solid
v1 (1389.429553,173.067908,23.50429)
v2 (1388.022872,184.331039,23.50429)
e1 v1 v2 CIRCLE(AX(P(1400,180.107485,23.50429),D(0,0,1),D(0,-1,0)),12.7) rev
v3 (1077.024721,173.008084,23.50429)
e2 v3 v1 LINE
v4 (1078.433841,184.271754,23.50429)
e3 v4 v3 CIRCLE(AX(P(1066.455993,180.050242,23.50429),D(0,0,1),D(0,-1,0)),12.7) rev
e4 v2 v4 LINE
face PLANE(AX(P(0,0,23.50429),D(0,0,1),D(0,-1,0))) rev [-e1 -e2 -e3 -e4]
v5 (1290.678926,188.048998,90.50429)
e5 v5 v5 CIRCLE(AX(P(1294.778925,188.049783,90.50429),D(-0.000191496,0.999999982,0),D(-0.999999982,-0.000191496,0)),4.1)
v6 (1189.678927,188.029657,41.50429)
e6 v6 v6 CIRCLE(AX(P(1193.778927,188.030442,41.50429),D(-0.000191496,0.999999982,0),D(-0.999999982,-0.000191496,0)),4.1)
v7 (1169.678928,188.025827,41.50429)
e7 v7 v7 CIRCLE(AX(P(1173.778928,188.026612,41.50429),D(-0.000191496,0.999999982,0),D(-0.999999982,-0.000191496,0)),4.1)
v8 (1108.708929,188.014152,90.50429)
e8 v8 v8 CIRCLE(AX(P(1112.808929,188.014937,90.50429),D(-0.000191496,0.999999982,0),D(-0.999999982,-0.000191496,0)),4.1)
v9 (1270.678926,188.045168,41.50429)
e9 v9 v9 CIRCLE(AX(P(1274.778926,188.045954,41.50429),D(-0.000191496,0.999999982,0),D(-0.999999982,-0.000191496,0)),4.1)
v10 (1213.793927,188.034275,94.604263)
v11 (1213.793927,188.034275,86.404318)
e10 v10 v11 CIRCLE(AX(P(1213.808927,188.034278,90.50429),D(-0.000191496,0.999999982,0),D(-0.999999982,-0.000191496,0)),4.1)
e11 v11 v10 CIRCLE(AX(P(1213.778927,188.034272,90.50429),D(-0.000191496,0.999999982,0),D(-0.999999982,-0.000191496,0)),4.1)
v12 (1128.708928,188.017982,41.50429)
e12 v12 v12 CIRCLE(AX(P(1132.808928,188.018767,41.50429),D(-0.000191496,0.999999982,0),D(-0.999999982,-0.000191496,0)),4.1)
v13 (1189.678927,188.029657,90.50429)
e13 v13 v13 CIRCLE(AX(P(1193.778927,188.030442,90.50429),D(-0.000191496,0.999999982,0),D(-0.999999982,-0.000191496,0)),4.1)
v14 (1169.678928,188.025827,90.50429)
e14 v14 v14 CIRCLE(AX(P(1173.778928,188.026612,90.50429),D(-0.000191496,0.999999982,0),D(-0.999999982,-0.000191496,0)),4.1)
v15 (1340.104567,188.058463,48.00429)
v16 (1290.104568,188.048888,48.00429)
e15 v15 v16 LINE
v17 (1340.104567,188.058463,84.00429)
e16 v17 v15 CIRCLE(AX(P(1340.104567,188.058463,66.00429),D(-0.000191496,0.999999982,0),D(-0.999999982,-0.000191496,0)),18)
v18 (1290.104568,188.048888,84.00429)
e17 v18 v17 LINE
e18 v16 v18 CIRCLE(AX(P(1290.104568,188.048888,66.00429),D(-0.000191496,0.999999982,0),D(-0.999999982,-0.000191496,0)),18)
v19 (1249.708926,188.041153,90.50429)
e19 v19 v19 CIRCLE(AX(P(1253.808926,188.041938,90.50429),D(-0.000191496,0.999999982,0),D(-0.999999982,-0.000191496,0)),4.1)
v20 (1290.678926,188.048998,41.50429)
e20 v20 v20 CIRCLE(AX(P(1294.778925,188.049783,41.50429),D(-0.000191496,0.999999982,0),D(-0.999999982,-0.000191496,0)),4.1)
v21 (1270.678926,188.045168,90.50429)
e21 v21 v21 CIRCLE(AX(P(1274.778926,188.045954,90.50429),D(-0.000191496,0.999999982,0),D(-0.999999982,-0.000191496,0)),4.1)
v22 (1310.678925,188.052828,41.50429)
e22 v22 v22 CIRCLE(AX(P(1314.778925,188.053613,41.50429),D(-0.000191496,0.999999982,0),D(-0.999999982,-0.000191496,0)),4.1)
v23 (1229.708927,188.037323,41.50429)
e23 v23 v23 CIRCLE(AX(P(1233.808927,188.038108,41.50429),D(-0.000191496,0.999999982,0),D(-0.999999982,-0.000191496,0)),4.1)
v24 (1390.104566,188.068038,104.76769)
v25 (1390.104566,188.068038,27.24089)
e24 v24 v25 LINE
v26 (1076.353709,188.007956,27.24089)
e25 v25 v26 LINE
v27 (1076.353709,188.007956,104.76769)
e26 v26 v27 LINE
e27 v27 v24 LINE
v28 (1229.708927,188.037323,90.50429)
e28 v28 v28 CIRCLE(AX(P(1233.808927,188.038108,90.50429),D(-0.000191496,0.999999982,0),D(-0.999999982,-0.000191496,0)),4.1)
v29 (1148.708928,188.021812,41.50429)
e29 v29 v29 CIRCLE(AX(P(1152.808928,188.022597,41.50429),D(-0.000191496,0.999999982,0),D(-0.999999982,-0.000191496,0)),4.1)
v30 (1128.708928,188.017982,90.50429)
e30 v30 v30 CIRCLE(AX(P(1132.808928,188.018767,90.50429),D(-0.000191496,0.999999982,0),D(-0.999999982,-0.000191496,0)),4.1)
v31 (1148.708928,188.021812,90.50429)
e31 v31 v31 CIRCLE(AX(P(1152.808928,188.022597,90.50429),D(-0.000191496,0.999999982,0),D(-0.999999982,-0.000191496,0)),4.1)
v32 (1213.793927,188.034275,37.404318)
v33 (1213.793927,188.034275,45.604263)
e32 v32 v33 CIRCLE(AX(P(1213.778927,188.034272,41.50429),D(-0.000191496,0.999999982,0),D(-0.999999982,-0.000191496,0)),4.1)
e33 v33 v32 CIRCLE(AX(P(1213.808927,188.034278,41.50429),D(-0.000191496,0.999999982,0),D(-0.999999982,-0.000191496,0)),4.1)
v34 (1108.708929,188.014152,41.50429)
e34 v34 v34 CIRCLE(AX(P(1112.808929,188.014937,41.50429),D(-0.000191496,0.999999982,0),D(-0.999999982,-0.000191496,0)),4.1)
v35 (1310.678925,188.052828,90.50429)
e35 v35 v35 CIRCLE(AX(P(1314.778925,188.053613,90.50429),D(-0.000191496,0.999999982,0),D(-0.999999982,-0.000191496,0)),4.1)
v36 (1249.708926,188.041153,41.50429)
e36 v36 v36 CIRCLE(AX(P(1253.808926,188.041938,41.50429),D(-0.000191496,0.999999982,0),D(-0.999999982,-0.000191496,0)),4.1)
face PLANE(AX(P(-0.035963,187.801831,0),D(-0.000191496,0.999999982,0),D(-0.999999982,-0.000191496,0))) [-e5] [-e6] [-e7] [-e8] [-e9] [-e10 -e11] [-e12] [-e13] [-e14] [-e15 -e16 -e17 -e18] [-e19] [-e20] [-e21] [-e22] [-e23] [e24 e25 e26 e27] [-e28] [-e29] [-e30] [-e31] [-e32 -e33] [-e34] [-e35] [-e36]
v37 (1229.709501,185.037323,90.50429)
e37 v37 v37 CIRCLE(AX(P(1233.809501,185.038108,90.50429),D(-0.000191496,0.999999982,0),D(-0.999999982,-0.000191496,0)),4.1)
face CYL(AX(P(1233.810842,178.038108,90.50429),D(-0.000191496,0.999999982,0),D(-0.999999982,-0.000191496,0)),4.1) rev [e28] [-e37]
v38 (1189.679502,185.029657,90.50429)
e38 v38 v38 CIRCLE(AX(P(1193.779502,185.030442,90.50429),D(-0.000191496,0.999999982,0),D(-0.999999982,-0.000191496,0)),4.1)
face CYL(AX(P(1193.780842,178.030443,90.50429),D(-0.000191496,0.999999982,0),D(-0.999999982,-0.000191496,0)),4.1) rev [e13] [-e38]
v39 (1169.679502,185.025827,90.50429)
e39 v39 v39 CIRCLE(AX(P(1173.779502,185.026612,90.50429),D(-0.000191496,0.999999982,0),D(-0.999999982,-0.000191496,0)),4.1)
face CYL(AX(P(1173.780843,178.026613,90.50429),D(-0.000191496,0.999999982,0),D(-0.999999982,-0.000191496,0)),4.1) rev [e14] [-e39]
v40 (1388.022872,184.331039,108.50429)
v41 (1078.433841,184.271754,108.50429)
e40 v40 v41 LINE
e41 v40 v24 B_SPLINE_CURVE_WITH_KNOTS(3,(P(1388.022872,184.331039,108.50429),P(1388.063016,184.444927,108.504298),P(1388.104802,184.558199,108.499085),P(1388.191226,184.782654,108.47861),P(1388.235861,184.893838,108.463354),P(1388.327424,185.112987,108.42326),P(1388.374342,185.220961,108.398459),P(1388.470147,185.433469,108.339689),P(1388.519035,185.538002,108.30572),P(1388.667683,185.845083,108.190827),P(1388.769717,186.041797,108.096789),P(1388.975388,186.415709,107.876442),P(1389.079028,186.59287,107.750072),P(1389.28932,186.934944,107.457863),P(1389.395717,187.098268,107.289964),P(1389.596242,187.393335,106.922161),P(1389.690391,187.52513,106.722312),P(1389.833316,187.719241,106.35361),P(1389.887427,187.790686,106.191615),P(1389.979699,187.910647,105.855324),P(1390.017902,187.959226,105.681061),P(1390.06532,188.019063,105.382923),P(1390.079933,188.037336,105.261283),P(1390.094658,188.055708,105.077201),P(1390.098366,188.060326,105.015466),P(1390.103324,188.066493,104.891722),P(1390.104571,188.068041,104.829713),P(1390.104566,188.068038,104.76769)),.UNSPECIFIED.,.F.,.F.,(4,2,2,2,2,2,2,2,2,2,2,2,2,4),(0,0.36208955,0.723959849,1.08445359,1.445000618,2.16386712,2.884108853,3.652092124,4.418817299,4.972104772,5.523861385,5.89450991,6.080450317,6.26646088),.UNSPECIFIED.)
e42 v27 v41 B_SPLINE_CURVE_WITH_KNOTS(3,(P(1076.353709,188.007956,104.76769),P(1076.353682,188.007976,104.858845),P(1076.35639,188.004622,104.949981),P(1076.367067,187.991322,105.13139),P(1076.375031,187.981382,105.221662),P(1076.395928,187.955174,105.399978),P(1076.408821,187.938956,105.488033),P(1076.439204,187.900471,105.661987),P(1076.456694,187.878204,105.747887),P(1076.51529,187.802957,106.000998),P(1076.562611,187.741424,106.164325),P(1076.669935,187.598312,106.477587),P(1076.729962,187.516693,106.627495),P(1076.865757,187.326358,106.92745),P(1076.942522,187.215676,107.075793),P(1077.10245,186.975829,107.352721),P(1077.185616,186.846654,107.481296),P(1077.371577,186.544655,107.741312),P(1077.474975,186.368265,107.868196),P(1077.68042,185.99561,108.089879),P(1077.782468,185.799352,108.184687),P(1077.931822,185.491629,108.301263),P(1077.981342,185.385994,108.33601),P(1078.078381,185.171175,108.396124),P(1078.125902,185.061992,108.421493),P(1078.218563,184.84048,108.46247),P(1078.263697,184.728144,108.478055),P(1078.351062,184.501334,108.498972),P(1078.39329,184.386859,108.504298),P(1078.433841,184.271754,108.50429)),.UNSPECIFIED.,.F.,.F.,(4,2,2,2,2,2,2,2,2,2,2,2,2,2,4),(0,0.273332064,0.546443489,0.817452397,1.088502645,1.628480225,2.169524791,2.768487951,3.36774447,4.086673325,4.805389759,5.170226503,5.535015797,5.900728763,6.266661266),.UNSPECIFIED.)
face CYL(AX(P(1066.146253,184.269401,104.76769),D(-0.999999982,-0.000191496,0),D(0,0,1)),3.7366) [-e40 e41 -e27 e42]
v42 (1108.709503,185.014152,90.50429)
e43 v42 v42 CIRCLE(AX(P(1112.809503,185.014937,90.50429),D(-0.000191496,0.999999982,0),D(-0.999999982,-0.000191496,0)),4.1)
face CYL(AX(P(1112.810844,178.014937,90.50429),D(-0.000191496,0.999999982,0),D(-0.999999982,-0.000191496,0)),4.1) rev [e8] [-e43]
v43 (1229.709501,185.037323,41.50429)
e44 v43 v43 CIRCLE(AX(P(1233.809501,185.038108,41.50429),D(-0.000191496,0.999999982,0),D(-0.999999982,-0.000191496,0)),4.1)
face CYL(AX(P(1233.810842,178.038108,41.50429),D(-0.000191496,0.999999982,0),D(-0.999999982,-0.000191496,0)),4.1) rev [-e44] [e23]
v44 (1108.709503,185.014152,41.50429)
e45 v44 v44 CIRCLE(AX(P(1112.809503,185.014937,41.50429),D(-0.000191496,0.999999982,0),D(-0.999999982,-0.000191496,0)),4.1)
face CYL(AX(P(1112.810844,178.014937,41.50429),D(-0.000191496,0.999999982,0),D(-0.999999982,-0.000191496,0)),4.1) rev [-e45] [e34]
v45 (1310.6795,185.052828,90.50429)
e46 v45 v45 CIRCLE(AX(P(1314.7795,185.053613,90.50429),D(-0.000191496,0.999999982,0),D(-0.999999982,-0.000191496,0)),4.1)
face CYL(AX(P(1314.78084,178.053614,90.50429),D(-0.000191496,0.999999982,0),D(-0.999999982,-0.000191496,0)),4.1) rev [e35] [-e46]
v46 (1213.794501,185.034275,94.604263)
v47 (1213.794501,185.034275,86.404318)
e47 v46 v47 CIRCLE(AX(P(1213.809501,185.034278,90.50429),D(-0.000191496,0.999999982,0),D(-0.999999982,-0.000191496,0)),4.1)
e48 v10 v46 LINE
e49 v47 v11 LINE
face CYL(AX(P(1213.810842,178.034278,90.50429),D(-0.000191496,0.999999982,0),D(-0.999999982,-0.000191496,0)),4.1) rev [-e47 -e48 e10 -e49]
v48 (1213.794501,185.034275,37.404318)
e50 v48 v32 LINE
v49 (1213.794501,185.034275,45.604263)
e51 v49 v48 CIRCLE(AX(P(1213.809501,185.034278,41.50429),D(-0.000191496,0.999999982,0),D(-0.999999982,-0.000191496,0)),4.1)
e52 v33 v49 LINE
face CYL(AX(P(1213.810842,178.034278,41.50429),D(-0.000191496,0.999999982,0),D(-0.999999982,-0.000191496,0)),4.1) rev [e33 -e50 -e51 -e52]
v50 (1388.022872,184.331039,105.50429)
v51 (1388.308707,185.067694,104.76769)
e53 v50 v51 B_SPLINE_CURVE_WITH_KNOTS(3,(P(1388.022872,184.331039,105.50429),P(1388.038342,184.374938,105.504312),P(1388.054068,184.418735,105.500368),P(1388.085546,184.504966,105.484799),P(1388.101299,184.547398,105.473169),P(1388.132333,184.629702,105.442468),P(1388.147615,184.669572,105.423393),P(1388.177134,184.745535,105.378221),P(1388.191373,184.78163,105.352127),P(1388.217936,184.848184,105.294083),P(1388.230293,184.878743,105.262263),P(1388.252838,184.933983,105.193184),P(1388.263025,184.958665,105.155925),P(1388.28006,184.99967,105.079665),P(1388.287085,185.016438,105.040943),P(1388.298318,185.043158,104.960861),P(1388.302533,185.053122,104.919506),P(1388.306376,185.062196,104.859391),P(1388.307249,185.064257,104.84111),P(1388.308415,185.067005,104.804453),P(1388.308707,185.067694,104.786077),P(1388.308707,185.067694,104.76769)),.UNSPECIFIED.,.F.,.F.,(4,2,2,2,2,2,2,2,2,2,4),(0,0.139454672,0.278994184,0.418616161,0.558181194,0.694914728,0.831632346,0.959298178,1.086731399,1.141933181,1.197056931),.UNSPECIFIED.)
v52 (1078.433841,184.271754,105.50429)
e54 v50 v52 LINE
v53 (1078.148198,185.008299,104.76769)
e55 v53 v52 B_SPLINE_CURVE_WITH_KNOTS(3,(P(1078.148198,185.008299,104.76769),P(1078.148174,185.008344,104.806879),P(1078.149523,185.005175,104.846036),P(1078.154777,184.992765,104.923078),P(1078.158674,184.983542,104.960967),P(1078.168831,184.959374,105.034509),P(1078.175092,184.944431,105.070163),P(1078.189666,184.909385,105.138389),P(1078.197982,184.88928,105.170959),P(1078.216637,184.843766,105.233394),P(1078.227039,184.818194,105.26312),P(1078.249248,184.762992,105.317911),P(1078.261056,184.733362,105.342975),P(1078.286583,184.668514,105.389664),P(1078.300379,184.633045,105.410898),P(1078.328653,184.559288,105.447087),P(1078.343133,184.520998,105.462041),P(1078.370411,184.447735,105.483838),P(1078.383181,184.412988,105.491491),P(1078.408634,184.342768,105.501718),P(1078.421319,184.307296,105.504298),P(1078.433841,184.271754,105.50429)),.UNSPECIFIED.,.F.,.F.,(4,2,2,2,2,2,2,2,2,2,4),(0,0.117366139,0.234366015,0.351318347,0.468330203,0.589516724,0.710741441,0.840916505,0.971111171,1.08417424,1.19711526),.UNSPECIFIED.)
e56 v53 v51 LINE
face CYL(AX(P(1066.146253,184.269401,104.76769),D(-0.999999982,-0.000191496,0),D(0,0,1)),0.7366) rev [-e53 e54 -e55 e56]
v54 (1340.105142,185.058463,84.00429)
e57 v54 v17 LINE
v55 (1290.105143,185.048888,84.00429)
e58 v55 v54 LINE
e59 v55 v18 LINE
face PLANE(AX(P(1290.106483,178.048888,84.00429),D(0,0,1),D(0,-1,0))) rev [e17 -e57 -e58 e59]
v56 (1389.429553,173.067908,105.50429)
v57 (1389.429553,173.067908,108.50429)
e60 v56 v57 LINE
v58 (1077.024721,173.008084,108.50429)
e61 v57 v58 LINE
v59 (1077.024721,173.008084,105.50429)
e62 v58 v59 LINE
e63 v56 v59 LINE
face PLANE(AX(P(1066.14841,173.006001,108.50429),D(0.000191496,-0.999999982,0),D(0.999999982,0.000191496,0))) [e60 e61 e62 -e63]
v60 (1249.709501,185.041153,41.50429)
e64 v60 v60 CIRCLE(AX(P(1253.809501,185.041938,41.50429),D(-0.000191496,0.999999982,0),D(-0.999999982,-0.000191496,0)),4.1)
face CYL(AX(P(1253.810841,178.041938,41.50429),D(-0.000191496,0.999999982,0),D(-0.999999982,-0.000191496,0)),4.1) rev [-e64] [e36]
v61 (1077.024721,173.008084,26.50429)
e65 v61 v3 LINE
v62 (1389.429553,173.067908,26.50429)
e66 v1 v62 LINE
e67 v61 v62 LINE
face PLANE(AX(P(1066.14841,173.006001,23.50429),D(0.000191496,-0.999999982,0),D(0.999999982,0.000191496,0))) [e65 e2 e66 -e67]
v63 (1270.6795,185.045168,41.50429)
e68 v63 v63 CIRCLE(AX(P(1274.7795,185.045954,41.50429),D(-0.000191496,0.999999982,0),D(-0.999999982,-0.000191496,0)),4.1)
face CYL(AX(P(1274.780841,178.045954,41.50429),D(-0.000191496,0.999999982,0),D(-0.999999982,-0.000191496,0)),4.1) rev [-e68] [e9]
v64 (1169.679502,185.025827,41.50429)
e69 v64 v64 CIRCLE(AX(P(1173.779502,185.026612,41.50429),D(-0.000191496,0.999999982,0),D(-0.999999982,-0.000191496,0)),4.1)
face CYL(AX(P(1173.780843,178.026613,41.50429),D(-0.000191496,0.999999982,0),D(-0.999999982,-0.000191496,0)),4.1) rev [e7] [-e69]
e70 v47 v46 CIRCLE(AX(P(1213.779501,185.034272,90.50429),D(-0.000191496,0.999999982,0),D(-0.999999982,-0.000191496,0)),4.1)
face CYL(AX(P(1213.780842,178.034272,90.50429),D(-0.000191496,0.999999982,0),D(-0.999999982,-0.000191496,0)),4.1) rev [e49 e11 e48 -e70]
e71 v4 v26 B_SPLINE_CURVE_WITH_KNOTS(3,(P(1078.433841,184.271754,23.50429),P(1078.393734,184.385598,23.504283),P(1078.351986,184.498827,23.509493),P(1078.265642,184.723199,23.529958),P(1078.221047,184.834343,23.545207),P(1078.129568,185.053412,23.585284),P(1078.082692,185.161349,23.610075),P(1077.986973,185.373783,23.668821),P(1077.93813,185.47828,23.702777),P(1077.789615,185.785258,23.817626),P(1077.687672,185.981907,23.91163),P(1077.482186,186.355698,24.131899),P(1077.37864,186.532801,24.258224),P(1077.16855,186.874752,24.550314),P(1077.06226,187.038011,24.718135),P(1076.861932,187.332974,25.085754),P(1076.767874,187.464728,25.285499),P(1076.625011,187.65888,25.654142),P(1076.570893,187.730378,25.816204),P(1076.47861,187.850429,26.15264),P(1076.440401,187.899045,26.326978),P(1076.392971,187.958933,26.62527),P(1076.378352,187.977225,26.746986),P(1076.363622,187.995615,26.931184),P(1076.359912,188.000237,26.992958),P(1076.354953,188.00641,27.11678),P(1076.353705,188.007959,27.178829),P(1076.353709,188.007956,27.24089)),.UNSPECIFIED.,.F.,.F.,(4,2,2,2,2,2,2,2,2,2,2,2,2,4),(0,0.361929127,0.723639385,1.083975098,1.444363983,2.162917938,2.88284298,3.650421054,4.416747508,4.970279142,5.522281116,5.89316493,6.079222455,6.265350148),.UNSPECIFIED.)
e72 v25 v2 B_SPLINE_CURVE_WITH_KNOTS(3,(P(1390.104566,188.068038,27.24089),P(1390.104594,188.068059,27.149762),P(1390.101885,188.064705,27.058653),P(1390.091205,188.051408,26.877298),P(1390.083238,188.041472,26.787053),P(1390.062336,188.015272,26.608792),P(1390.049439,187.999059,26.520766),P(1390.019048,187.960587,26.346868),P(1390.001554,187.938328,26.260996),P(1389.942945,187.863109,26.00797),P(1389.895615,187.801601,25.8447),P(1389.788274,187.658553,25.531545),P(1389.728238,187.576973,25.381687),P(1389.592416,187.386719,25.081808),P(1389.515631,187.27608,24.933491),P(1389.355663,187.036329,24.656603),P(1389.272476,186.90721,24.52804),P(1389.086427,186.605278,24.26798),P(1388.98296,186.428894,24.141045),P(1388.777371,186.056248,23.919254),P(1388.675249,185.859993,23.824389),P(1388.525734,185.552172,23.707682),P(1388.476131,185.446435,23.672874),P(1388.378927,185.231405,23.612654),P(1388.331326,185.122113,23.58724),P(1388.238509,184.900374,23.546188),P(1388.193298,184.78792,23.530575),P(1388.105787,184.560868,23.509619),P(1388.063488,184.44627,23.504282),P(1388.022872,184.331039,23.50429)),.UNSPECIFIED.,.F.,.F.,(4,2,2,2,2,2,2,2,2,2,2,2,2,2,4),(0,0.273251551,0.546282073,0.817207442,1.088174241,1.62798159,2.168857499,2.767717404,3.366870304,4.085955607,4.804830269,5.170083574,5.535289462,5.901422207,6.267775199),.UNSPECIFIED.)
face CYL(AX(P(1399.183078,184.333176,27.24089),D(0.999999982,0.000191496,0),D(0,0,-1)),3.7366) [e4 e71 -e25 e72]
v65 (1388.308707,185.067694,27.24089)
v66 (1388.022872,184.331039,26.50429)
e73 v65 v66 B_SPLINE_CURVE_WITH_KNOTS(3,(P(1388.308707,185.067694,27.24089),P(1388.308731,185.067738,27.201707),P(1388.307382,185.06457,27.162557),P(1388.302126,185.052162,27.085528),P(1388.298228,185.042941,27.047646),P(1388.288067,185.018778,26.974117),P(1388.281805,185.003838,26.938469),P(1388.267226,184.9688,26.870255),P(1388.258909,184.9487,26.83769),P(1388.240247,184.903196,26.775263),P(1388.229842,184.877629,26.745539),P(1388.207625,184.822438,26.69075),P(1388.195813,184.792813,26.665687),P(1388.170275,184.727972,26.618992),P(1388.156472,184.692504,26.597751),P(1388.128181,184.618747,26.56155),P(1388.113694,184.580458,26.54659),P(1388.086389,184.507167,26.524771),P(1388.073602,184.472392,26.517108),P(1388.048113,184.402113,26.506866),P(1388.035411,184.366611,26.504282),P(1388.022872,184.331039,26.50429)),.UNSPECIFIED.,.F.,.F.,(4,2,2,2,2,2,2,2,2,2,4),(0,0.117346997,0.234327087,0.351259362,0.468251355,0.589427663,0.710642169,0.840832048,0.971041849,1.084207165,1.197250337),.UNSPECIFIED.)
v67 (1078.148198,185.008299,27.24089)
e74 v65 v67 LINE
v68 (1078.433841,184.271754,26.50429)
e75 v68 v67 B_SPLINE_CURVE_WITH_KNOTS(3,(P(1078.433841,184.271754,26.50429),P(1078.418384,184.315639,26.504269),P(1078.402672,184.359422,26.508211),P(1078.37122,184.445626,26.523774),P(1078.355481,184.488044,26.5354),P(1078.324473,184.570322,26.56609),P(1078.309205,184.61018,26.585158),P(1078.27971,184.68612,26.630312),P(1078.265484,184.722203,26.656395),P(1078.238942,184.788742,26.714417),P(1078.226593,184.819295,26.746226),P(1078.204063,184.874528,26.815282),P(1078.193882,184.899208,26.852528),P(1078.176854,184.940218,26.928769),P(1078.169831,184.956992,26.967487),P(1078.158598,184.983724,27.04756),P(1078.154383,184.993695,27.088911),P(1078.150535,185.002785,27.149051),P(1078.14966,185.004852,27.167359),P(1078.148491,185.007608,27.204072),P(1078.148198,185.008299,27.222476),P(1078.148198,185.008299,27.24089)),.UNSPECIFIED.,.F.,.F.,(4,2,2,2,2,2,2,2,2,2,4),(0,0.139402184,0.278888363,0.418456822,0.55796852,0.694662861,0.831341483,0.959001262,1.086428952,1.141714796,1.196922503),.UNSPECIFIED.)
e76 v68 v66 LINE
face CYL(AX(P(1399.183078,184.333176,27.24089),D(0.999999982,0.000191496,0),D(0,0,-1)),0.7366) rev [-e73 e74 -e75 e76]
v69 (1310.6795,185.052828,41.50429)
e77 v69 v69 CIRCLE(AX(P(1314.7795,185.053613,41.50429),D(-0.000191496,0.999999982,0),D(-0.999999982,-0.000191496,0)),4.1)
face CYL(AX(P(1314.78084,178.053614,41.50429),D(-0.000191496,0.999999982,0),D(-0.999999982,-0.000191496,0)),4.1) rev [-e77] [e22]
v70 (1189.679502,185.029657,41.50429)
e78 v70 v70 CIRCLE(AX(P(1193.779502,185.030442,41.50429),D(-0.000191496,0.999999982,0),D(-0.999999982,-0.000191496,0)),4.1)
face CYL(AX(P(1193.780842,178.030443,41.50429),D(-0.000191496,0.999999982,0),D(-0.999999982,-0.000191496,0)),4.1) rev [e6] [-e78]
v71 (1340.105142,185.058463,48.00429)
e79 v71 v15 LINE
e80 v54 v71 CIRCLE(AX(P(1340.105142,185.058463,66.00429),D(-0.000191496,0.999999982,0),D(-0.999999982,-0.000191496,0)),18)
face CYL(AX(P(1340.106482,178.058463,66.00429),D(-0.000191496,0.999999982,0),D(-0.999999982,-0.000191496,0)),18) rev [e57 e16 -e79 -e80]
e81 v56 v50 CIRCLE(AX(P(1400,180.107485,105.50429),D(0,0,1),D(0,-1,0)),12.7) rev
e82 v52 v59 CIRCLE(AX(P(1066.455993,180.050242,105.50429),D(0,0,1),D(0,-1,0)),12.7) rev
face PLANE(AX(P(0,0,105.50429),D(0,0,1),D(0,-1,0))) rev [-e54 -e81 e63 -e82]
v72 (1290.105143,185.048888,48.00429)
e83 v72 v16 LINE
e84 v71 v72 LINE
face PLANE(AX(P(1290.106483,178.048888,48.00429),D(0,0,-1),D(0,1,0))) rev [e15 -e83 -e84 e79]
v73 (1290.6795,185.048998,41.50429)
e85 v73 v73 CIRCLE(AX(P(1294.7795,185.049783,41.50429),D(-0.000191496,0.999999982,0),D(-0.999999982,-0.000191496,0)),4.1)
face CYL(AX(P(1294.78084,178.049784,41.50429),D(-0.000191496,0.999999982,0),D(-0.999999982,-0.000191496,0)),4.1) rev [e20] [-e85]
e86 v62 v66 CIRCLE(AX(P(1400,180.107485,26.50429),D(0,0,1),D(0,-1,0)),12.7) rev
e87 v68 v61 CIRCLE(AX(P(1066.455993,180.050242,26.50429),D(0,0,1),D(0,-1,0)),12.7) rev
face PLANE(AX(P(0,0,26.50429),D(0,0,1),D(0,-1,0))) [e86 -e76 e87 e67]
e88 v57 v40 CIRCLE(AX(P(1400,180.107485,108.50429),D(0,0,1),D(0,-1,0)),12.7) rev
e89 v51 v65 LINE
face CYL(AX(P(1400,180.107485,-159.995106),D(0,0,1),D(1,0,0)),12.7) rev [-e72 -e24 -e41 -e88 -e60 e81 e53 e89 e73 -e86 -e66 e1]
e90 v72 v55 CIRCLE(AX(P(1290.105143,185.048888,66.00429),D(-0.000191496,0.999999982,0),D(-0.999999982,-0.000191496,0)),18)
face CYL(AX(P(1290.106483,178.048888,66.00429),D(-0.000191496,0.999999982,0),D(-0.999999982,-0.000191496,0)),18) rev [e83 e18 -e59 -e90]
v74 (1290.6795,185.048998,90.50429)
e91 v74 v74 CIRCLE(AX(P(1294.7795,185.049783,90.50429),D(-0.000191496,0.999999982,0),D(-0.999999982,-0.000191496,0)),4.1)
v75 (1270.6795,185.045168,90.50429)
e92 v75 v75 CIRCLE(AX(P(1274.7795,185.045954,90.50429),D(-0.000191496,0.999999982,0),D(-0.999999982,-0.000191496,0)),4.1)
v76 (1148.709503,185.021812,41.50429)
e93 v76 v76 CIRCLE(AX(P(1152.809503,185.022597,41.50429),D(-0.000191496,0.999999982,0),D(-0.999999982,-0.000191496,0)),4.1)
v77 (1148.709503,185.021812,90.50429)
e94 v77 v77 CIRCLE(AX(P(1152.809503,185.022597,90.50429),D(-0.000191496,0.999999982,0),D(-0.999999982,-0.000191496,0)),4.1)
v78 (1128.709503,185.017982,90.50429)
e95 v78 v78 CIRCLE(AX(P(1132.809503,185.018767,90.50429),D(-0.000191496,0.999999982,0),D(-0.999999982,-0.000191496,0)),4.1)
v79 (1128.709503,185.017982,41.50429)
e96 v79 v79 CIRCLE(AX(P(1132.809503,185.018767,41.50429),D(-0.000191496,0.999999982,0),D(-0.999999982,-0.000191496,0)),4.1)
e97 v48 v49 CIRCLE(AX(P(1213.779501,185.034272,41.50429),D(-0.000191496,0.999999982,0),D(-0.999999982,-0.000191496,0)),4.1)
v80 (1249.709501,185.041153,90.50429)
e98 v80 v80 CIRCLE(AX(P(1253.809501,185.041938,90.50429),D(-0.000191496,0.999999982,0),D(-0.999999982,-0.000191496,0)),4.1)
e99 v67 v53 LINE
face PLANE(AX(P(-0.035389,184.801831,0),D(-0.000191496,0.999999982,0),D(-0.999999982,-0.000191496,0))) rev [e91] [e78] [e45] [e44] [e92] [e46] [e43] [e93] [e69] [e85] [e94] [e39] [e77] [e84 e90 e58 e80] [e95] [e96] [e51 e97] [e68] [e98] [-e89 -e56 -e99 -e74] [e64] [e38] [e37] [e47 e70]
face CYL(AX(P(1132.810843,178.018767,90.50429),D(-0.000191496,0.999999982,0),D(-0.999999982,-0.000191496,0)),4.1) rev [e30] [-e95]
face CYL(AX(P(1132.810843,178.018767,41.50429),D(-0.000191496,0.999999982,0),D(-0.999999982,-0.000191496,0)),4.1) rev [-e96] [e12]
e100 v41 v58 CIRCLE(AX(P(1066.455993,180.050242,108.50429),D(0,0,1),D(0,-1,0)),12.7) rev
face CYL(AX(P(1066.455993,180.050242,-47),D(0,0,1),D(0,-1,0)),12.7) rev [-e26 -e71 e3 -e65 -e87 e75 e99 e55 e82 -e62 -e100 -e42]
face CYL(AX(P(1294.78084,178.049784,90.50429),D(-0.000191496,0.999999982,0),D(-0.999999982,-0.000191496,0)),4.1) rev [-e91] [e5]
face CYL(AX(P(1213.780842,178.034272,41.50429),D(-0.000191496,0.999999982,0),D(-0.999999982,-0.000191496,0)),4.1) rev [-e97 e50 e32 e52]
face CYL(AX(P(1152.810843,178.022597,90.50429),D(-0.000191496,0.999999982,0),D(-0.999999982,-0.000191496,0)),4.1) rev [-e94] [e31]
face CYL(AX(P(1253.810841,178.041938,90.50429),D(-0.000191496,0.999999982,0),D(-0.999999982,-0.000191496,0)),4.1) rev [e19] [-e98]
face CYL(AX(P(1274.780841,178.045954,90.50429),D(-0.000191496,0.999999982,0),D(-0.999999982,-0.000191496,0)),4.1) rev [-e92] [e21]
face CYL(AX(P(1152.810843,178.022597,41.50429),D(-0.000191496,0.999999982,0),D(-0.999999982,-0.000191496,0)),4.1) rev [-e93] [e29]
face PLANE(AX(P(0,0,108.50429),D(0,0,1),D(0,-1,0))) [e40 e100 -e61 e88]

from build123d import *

# Parameters (mm, degrees)
SKETCH3_W                      = 333.036830712
SKETCH3_H                      = 85
BASE_FLANGE1_DEPTH             = 3
EDGE_FLANGE1_STRIP_W           = 13.4732
EDGE_FLANGE1_STRIP_H           = 3
EDGE_FLANGE1_STRIP_CUT_DEPTH   = 333.036830711
EDGE_FLANGE1_STRIP_2_W         = 13.4732
EDGE_FLANGE1_STRIP_2_H         = 3
EDGE_FLANGE1_STRIP_CUT_2_DEPTH = 333.036830711
EDGE_FLANGE1_DEPTH             = 333.036830711
EDGE_FLANGE1_BEND_DEPTH        = 333.036830711
SKETCH14_R                     = 4.1
CUT_EXTRUDE1_DEPTH             = 10
LPATTERN1_COUNT                = 3
LPATTERN1_PITCH                = 20
INDENT1_START                  = 23
INDENT1_DEPTH                  = 87
INDENT1_START_2                = 1066.181520764
INDENT1_2_DEPTH                = 11.708931468
INDENT1_START_3                = 23.50429019
INDENT1_3_DEPTH                = 85
INDENT1_START_4                = 1388.984464138
INDENT1_4_DEPTH                = 10.233887338
INDENT1_5_DEPTH                = 85
CUT_EXTRUDE2_DEPTH             = 10
LPATTERN2_COUNT                = 2
LPATTERN2_PITCH                = 101
LPATTERN2_COPY_1_SKETCH_R      = 4.1
LPATTERN2_COPY_1_DEPTH         = 10
LPATTERN2_COPY_2_SKETCH_R      = 4.1
LPATTERN2_COPY_2_DEPTH         = 10


with BuildPart() as part:
    # Base-Flange1: sheet metal written as solids
    # Sketch3 → Base-Flange1 (new body)
    with BuildSketch(Plane(origin=(-0.035963347, 187.801831242, 0), x_dir=(0.9999999816645936, 0.0001914962472965804, 0), z_dir=(-0.0001914962472965804, 0.9999999816645936, 0))):
        with Locations((1232.69993612, -66.00429019)):
            Rectangle(SKETCH3_W, SKETCH3_H)
    extrude(amount=-BASE_FLANGE1_DEPTH)

    # Edge-Flange1: sheet metal written as solids
    # Edge-Flange1 strip (on a plane across the edge) → Edge-Flange1 strip cut (cut)
    with BuildSketch(Plane(origin=(1399.182936963, 185.06977636, 108.50429019), x_dir=(0, 0, -1), z_dir=(-0.9999999816645935, -0.00019149624729661617, 0))):
        with Locations((-3, -1.5)):
            Rectangle(EDGE_FLANGE1_STRIP_W, EDGE_FLANGE1_STRIP_H)
    extrude(amount=EDGE_FLANGE1_STRIP_CUT_DEPTH, mode=Mode.SUBTRACT)

    # Edge-Flange1 strip 2 (on a plane across the edge) → Edge-Flange1 strip cut 2 (cut)
    with BuildSketch(Plane(origin=(1066.146112358, 185.006001057, 23.50429019), x_dir=(0, 0, 1), z_dir=(0.9999999816645935, 0.00019149624729661617, 0))):
        with Locations((-3, -1.5)):
            Rectangle(EDGE_FLANGE1_STRIP_2_W, EDGE_FLANGE1_STRIP_2_H)
    extrude(amount=EDGE_FLANGE1_STRIP_CUT_2_DEPTH, mode=Mode.SUBTRACT)

    # Edge-Flange1 section (on a plane across the edge) → Edge-Flange1 (add)
    with BuildSketch(Plane(origin=(1399.182936963, 185.06977636, 108.50429019), x_dir=(0, 0, -1), z_dir=(-0.9999999816645935, -0.00019149624729661617, 0))):
        with BuildLine():
            Line((0, 0.7366), (0, 12))
            Line((0, 12), (3, 12))
            Line((3, 12), (3, 0.7366))
            ThreePointArc((3, 0.7366), (3.215745145, 0.215745145), (3.7366, 0))
            Line((3.7366, 0), (3.7366, -3))
            ThreePointArc((3.7366, -3), (1.094424801, -1.905575199), (0, 0.7366))
        make_face()
    extrude(amount=EDGE_FLANGE1_DEPTH)

    # Edge-Flange1 section 2 (on a plane across the edge) → Edge-Flange1 bend (add)
    with BuildSketch(Plane(origin=(1066.146112358, 185.006001057, 23.50429019), x_dir=(0, 0, 1), z_dir=(0.9999999816645935, 0.00019149624729661617, 0))):
        with BuildLine():
            Line((0, 0.7366), (0, 12))
            Line((0, 12), (3, 12))
            Line((3, 12), (3, 0.7366))
            ThreePointArc((3, 0.7366), (3.215745145, 0.215745145), (3.7366, 0))
            Line((3.7366, 0), (3.7366, -3))
            ThreePointArc((3.7366, -3), (1.094424801, -1.905575199), (0, 0.7366))
        make_face()
    extrude(amount=EDGE_FLANGE1_BEND_DEPTH)

    # Sketch14 → Cut-Extrude1 (cut)
    with BuildSketch(Plane(origin=(-0.035963347, 187.801831242, 0), x_dir=(0.9999999816645936, 0.00019149624729658044, 0), z_dir=(-0.00019149624729658044, 0.9999999816645936, 0))):
        with Locations(Location((1152.844912527, -41.50429019, 0), (0, 0, 180))):
            Circle(SKETCH14_R)
        with Locations(Location((1213.814912527, -41.50429019, 0), (0, 0, 180))):
            Circle(SKETCH14_R)
        with Locations(Location((1152.844912527, -90.50429019, 0), (0, 0, 180))):
            Circle(SKETCH14_R)
        with Locations(Location((1213.814912527, -90.50429019, 0), (0, 0, 180))):
            Circle(SKETCH14_R)
    cut_extrude1 = extrude(amount=-CUT_EXTRUDE1_DEPTH, mode=Mode.SUBTRACT)

    # LPattern1: Cut-Extrude1 ×3
    with Locations(*[Vector(-0.9999999816645936, -0.00019149624729658041, 0) * (i * LPATTERN1_PITCH) for i in range(1, LPATTERN1_COUNT)]):
        add(cut_extrude1, mode=Mode.SUBTRACT)

    # Indent1: read off the stored shape, not the designer's step
    # Indent1 outline → Indent1 (cut)
    with BuildSketch(Plane.XY.offset(INDENT1_START)):
        with BuildLine():
            Line((1391.658769663, 190), (1390.104573792, 188.068047026))
            ThreePointArc((1390.104573792, 188.068047026), (1387.312839815, 180.67842019), (1389.429552771, 173.067908404))
            Line((1389.429552771, 173.067908404), (1390.14074534, 172))
            Line((1390.14074534, 172), (1399.185439777, 172))
            Line((1399.185439777, 172), (1401, 172))
            Line((1401, 172), (1401, 190))
            Line((1401, 190), (1391.658769663, 190))
        make_face()
        with BuildLine():
            Line((1076.353702039, 188.007964899), (1074.752112936, 190))
            Line((1074.752112936, 190), (1065, 190))
            Line((1065, 190), (1065, 172))
            Line((1065, 172), (1066.14860296, 172))
            Line((1066.14860296, 172), (1076.353013915, 172))
            Line((1076.353013915, 172), (1077.024720786, 173.00808405))
            ThreePointArc((1077.024720786, 173.00808405), (1079.143304168, 180.617808163), (1076.353702039, 188.007964899))
        make_face()
    extrude(amount=INDENT1_DEPTH, mode=Mode.SUBTRACT)

    # Sketch15 → Cut-Extrude2 (cut)
    with BuildSketch(Plane(origin=(-0.035963347, 187.801831242, 0), x_dir=(0.9999999816645936, 0.0001914962472966162, 0), z_dir=(-0.0001914962472966162, 0.9999999816645936, 0))):
        with BuildLine():
            Line((1290.140555319, -48.00429019), (1340.140555319, -48.00429019))
            ThreePointArc((1340.140555319, -48.00429019), (1358.140555319, -66.00429019), (1340.140555319, -84.00429019))
            Line((1340.140555319, -84.00429019), (1290.140555319, -84.00429019))
            ThreePointArc((1290.140555319, -84.00429019), (1272.140555319, -66.00429019), (1290.140555319, -48.00429019))
        make_face()
    extrude(amount=-CUT_EXTRUDE2_DEPTH, mode=Mode.SUBTRACT)

    # LPattern2: Cut-Extrude1 ×2
    with Locations(*[Vector(0.9999999816645935, 0.0001914962472965804, 0) * (i * LPATTERN2_PITCH) for i in range(1, LPATTERN2_COUNT)]):
        add(cut_extrude1, mode=Mode.SUBTRACT)

    # LPattern2 copy 1 sketch → LPattern2 copy 1 (cut)
    with BuildSketch(Plane(origin=(80.964035168, 187.817342438, 0), x_dir=(0.9999999816645936, 0.00019149624729658044, 0), z_dir=(-0.00019149624729658044, 0.9999999816645936, 0))):
        with Locations(Location((1152.844912527, -41.50429019, 0), (0, 0, 180))):
            Circle(LPATTERN2_COPY_1_SKETCH_R)
        with Locations(Location((1213.814912527, -41.50429019, 0), (0, 0, 180))):
            Circle(LPATTERN2_COPY_1_SKETCH_R)
        with Locations(Location((1152.844912527, -90.50429019, 0), (0, 0, 180))):
            Circle(LPATTERN2_COPY_1_SKETCH_R)
        with Locations(Location((1213.814912527, -90.50429019, 0), (0, 0, 180))):
            Circle(LPATTERN2_COPY_1_SKETCH_R)
    extrude(amount=-LPATTERN2_COPY_1_DEPTH, mode=Mode.SUBTRACT)

    # LPattern2 copy 2 sketch → LPattern2 copy 2 (cut)
    with BuildSketch(Plane(origin=(60.964035535, 187.813512513, 0), x_dir=(0.9999999816645936, 0.00019149624729658044, 0), z_dir=(-0.00019149624729658044, 0.9999999816645936, 0))):
        with Locations(Location((1152.844912527, -41.50429019, 0), (0, 0, 180))):
            Circle(LPATTERN2_COPY_2_SKETCH_R)
        with Locations(Location((1213.814912527, -41.50429019, 0), (0, 0, 180))):
            Circle(LPATTERN2_COPY_2_SKETCH_R)
        with Locations(Location((1152.844912527, -90.50429019, 0), (0, 0, 180))):
            Circle(LPATTERN2_COPY_2_SKETCH_R)
        with Locations(Location((1213.814912527, -90.50429019, 0), (0, 0, 180))):
            Circle(LPATTERN2_COPY_2_SKETCH_R)
    extrude(amount=-LPATTERN2_COPY_2_DEPTH, mode=Mode.SUBTRACT)


with BuildPart() as body_2:
    # Indent1 2 outline → Indent1 2 (new body)
    with BuildSketch(Plane(origin=(0, 0, 0), x_dir=(-0.00019149624731436396, 0.9999999816645935, 0), z_dir=(0.9999999816645936, 0.00019149624731436393, 0)).offset(INDENT1_START_2)):
        with BuildLine():
            ThreePointArc((184.801834685, 27.24089019), (184.58608954, 26.720035335), (184.065234685, 26.50429019))
            Line((184.065234685, 26.50429019), (172.801834685, 26.50429019))
            Line((172.801834685, 26.50429019), (172.801834685, 23.50429019))
            Line((172.801834685, 23.50429019), (184.065234685, 23.50429019))
            ThreePointArc((184.065234685, 23.50429019), (186.707409883, 24.598714992), (187.801834685, 27.24089019))
            Line((187.801834685, 27.24089019), (187.801834685, 104.76769019))
            ThreePointArc((187.801834685, 104.76769019), (186.707409884, 107.409865389), (184.065234685, 108.50429019))
            Line((184.065234685, 108.50429019), (172.801834685, 108.50429019))
            Line((172.801834685, 108.50429019), (172.801834685, 105.50429019))
            Line((172.801834685, 105.50429019), (184.065234685, 105.50429019))
            ThreePointArc((184.065234685, 105.50429019), (184.58608954, 105.288545045), (184.801834685, 104.76769019))
            Line((184.801834685, 104.76769019), (184.801834685, 27.24089019))
        make_face()
    extrude(amount=INDENT1_2_DEPTH)

    # Indent1 3 outline → Indent1 3 (cut)
    with BuildSketch(Plane.XY.offset(INDENT1_START_3)):
        with BuildLine():
            Line((1077.855992631, 180.052424815), (1077.854469122, 188.008243218))
            Line((1077.854469122, 188.008243218), (1074.619319449, 188.007634777))
            ThreePointArc((1074.619319449, 188.007634777), (1077.015456668, 184.346487369), (1077.855992631, 180.052424815))
        make_face()
        with BuildLine():
            ThreePointArc((1077.855992631, 180.052424815), (1077.230304306, 176.325431683), (1075.420572237, 173.007776861))
            Line((1075.420572237, 173.007776861), (1077.857341566, 173.008243493))
            Line((1077.857341566, 173.008243493), (1077.855992631, 180.052424815))
        make_face()
    extrude(amount=INDENT1_3_DEPTH, mode=Mode.SUBTRACT)


with BuildPart() as body_3:
    # Indent1 4 outline → Indent1 4 (new body)
    with BuildSketch(Plane(origin=(0, 0, 0), x_dir=(-0.00019149624729552394, 0.9999999816645935, 0), z_dir=(0.9999999816645936, 0.0001914962472955239, 0)).offset(INDENT1_START_4)):
        with BuildLine():
            ThreePointArc((187.801834685, 104.76769019), (186.707409884, 107.409865389), (184.065234685, 108.50429019))
            Line((184.065234685, 108.50429019), (172.801834685, 108.50429019))
            Line((172.801834685, 108.50429019), (172.801834685, 105.50429019))
            Line((172.801834685, 105.50429019), (184.065234685, 105.50429019))
            ThreePointArc((184.065234685, 105.50429019), (184.58608954, 105.288545045), (184.801834685, 104.76769019))
            Line((184.801834685, 104.76769019), (184.801834685, 27.24089019))
            ThreePointArc((184.801834685, 27.24089019), (184.58608954, 26.720035335), (184.065234685, 26.50429019))
            Line((184.065234685, 26.50429019), (172.801834685, 26.50429019))
            Line((172.801834685, 26.50429019), (172.801834685, 23.50429019))
            Line((172.801834685, 23.50429019), (184.065234685, 23.50429019))
            ThreePointArc((184.065234685, 23.50429019), (186.707409883, 24.598714992), (187.801834685, 27.24089019))
            Line((187.801834685, 27.24089019), (187.801834685, 104.76769019))
        make_face()
    extrude(amount=INDENT1_4_DEPTH)

    # Indent1 5 outline → Indent1 5 (cut)
    with BuildSketch(Plane.XY.offset(INDENT1_START_3)):
        with BuildLine():
            ThreePointArc((1391.482231002, 173.068301484), (1389.602669792, 176.366092083), (1388.950000203, 180.105369497))
            Line((1388.950000203, 180.105369497), (1388.951347768, 173.067816829))
            Line((1388.951347768, 173.067816829), (1391.482231002, 173.068301484))
        make_face()
        with BuildLine():
            Line((1392.336768964, 188.068477256), (1388.948475324, 188.067816554))
            Line((1388.948475324, 188.067816554), (1388.950000203, 180.105369497))
            ThreePointArc((1388.950000203, 180.105369497), (1389.831468968, 184.432237107), (1392.336768964, 188.068477256))
        make_face()
    extrude(amount=INDENT1_5_DEPTH, mode=Mode.SUBTRACT)


solid = part.part
